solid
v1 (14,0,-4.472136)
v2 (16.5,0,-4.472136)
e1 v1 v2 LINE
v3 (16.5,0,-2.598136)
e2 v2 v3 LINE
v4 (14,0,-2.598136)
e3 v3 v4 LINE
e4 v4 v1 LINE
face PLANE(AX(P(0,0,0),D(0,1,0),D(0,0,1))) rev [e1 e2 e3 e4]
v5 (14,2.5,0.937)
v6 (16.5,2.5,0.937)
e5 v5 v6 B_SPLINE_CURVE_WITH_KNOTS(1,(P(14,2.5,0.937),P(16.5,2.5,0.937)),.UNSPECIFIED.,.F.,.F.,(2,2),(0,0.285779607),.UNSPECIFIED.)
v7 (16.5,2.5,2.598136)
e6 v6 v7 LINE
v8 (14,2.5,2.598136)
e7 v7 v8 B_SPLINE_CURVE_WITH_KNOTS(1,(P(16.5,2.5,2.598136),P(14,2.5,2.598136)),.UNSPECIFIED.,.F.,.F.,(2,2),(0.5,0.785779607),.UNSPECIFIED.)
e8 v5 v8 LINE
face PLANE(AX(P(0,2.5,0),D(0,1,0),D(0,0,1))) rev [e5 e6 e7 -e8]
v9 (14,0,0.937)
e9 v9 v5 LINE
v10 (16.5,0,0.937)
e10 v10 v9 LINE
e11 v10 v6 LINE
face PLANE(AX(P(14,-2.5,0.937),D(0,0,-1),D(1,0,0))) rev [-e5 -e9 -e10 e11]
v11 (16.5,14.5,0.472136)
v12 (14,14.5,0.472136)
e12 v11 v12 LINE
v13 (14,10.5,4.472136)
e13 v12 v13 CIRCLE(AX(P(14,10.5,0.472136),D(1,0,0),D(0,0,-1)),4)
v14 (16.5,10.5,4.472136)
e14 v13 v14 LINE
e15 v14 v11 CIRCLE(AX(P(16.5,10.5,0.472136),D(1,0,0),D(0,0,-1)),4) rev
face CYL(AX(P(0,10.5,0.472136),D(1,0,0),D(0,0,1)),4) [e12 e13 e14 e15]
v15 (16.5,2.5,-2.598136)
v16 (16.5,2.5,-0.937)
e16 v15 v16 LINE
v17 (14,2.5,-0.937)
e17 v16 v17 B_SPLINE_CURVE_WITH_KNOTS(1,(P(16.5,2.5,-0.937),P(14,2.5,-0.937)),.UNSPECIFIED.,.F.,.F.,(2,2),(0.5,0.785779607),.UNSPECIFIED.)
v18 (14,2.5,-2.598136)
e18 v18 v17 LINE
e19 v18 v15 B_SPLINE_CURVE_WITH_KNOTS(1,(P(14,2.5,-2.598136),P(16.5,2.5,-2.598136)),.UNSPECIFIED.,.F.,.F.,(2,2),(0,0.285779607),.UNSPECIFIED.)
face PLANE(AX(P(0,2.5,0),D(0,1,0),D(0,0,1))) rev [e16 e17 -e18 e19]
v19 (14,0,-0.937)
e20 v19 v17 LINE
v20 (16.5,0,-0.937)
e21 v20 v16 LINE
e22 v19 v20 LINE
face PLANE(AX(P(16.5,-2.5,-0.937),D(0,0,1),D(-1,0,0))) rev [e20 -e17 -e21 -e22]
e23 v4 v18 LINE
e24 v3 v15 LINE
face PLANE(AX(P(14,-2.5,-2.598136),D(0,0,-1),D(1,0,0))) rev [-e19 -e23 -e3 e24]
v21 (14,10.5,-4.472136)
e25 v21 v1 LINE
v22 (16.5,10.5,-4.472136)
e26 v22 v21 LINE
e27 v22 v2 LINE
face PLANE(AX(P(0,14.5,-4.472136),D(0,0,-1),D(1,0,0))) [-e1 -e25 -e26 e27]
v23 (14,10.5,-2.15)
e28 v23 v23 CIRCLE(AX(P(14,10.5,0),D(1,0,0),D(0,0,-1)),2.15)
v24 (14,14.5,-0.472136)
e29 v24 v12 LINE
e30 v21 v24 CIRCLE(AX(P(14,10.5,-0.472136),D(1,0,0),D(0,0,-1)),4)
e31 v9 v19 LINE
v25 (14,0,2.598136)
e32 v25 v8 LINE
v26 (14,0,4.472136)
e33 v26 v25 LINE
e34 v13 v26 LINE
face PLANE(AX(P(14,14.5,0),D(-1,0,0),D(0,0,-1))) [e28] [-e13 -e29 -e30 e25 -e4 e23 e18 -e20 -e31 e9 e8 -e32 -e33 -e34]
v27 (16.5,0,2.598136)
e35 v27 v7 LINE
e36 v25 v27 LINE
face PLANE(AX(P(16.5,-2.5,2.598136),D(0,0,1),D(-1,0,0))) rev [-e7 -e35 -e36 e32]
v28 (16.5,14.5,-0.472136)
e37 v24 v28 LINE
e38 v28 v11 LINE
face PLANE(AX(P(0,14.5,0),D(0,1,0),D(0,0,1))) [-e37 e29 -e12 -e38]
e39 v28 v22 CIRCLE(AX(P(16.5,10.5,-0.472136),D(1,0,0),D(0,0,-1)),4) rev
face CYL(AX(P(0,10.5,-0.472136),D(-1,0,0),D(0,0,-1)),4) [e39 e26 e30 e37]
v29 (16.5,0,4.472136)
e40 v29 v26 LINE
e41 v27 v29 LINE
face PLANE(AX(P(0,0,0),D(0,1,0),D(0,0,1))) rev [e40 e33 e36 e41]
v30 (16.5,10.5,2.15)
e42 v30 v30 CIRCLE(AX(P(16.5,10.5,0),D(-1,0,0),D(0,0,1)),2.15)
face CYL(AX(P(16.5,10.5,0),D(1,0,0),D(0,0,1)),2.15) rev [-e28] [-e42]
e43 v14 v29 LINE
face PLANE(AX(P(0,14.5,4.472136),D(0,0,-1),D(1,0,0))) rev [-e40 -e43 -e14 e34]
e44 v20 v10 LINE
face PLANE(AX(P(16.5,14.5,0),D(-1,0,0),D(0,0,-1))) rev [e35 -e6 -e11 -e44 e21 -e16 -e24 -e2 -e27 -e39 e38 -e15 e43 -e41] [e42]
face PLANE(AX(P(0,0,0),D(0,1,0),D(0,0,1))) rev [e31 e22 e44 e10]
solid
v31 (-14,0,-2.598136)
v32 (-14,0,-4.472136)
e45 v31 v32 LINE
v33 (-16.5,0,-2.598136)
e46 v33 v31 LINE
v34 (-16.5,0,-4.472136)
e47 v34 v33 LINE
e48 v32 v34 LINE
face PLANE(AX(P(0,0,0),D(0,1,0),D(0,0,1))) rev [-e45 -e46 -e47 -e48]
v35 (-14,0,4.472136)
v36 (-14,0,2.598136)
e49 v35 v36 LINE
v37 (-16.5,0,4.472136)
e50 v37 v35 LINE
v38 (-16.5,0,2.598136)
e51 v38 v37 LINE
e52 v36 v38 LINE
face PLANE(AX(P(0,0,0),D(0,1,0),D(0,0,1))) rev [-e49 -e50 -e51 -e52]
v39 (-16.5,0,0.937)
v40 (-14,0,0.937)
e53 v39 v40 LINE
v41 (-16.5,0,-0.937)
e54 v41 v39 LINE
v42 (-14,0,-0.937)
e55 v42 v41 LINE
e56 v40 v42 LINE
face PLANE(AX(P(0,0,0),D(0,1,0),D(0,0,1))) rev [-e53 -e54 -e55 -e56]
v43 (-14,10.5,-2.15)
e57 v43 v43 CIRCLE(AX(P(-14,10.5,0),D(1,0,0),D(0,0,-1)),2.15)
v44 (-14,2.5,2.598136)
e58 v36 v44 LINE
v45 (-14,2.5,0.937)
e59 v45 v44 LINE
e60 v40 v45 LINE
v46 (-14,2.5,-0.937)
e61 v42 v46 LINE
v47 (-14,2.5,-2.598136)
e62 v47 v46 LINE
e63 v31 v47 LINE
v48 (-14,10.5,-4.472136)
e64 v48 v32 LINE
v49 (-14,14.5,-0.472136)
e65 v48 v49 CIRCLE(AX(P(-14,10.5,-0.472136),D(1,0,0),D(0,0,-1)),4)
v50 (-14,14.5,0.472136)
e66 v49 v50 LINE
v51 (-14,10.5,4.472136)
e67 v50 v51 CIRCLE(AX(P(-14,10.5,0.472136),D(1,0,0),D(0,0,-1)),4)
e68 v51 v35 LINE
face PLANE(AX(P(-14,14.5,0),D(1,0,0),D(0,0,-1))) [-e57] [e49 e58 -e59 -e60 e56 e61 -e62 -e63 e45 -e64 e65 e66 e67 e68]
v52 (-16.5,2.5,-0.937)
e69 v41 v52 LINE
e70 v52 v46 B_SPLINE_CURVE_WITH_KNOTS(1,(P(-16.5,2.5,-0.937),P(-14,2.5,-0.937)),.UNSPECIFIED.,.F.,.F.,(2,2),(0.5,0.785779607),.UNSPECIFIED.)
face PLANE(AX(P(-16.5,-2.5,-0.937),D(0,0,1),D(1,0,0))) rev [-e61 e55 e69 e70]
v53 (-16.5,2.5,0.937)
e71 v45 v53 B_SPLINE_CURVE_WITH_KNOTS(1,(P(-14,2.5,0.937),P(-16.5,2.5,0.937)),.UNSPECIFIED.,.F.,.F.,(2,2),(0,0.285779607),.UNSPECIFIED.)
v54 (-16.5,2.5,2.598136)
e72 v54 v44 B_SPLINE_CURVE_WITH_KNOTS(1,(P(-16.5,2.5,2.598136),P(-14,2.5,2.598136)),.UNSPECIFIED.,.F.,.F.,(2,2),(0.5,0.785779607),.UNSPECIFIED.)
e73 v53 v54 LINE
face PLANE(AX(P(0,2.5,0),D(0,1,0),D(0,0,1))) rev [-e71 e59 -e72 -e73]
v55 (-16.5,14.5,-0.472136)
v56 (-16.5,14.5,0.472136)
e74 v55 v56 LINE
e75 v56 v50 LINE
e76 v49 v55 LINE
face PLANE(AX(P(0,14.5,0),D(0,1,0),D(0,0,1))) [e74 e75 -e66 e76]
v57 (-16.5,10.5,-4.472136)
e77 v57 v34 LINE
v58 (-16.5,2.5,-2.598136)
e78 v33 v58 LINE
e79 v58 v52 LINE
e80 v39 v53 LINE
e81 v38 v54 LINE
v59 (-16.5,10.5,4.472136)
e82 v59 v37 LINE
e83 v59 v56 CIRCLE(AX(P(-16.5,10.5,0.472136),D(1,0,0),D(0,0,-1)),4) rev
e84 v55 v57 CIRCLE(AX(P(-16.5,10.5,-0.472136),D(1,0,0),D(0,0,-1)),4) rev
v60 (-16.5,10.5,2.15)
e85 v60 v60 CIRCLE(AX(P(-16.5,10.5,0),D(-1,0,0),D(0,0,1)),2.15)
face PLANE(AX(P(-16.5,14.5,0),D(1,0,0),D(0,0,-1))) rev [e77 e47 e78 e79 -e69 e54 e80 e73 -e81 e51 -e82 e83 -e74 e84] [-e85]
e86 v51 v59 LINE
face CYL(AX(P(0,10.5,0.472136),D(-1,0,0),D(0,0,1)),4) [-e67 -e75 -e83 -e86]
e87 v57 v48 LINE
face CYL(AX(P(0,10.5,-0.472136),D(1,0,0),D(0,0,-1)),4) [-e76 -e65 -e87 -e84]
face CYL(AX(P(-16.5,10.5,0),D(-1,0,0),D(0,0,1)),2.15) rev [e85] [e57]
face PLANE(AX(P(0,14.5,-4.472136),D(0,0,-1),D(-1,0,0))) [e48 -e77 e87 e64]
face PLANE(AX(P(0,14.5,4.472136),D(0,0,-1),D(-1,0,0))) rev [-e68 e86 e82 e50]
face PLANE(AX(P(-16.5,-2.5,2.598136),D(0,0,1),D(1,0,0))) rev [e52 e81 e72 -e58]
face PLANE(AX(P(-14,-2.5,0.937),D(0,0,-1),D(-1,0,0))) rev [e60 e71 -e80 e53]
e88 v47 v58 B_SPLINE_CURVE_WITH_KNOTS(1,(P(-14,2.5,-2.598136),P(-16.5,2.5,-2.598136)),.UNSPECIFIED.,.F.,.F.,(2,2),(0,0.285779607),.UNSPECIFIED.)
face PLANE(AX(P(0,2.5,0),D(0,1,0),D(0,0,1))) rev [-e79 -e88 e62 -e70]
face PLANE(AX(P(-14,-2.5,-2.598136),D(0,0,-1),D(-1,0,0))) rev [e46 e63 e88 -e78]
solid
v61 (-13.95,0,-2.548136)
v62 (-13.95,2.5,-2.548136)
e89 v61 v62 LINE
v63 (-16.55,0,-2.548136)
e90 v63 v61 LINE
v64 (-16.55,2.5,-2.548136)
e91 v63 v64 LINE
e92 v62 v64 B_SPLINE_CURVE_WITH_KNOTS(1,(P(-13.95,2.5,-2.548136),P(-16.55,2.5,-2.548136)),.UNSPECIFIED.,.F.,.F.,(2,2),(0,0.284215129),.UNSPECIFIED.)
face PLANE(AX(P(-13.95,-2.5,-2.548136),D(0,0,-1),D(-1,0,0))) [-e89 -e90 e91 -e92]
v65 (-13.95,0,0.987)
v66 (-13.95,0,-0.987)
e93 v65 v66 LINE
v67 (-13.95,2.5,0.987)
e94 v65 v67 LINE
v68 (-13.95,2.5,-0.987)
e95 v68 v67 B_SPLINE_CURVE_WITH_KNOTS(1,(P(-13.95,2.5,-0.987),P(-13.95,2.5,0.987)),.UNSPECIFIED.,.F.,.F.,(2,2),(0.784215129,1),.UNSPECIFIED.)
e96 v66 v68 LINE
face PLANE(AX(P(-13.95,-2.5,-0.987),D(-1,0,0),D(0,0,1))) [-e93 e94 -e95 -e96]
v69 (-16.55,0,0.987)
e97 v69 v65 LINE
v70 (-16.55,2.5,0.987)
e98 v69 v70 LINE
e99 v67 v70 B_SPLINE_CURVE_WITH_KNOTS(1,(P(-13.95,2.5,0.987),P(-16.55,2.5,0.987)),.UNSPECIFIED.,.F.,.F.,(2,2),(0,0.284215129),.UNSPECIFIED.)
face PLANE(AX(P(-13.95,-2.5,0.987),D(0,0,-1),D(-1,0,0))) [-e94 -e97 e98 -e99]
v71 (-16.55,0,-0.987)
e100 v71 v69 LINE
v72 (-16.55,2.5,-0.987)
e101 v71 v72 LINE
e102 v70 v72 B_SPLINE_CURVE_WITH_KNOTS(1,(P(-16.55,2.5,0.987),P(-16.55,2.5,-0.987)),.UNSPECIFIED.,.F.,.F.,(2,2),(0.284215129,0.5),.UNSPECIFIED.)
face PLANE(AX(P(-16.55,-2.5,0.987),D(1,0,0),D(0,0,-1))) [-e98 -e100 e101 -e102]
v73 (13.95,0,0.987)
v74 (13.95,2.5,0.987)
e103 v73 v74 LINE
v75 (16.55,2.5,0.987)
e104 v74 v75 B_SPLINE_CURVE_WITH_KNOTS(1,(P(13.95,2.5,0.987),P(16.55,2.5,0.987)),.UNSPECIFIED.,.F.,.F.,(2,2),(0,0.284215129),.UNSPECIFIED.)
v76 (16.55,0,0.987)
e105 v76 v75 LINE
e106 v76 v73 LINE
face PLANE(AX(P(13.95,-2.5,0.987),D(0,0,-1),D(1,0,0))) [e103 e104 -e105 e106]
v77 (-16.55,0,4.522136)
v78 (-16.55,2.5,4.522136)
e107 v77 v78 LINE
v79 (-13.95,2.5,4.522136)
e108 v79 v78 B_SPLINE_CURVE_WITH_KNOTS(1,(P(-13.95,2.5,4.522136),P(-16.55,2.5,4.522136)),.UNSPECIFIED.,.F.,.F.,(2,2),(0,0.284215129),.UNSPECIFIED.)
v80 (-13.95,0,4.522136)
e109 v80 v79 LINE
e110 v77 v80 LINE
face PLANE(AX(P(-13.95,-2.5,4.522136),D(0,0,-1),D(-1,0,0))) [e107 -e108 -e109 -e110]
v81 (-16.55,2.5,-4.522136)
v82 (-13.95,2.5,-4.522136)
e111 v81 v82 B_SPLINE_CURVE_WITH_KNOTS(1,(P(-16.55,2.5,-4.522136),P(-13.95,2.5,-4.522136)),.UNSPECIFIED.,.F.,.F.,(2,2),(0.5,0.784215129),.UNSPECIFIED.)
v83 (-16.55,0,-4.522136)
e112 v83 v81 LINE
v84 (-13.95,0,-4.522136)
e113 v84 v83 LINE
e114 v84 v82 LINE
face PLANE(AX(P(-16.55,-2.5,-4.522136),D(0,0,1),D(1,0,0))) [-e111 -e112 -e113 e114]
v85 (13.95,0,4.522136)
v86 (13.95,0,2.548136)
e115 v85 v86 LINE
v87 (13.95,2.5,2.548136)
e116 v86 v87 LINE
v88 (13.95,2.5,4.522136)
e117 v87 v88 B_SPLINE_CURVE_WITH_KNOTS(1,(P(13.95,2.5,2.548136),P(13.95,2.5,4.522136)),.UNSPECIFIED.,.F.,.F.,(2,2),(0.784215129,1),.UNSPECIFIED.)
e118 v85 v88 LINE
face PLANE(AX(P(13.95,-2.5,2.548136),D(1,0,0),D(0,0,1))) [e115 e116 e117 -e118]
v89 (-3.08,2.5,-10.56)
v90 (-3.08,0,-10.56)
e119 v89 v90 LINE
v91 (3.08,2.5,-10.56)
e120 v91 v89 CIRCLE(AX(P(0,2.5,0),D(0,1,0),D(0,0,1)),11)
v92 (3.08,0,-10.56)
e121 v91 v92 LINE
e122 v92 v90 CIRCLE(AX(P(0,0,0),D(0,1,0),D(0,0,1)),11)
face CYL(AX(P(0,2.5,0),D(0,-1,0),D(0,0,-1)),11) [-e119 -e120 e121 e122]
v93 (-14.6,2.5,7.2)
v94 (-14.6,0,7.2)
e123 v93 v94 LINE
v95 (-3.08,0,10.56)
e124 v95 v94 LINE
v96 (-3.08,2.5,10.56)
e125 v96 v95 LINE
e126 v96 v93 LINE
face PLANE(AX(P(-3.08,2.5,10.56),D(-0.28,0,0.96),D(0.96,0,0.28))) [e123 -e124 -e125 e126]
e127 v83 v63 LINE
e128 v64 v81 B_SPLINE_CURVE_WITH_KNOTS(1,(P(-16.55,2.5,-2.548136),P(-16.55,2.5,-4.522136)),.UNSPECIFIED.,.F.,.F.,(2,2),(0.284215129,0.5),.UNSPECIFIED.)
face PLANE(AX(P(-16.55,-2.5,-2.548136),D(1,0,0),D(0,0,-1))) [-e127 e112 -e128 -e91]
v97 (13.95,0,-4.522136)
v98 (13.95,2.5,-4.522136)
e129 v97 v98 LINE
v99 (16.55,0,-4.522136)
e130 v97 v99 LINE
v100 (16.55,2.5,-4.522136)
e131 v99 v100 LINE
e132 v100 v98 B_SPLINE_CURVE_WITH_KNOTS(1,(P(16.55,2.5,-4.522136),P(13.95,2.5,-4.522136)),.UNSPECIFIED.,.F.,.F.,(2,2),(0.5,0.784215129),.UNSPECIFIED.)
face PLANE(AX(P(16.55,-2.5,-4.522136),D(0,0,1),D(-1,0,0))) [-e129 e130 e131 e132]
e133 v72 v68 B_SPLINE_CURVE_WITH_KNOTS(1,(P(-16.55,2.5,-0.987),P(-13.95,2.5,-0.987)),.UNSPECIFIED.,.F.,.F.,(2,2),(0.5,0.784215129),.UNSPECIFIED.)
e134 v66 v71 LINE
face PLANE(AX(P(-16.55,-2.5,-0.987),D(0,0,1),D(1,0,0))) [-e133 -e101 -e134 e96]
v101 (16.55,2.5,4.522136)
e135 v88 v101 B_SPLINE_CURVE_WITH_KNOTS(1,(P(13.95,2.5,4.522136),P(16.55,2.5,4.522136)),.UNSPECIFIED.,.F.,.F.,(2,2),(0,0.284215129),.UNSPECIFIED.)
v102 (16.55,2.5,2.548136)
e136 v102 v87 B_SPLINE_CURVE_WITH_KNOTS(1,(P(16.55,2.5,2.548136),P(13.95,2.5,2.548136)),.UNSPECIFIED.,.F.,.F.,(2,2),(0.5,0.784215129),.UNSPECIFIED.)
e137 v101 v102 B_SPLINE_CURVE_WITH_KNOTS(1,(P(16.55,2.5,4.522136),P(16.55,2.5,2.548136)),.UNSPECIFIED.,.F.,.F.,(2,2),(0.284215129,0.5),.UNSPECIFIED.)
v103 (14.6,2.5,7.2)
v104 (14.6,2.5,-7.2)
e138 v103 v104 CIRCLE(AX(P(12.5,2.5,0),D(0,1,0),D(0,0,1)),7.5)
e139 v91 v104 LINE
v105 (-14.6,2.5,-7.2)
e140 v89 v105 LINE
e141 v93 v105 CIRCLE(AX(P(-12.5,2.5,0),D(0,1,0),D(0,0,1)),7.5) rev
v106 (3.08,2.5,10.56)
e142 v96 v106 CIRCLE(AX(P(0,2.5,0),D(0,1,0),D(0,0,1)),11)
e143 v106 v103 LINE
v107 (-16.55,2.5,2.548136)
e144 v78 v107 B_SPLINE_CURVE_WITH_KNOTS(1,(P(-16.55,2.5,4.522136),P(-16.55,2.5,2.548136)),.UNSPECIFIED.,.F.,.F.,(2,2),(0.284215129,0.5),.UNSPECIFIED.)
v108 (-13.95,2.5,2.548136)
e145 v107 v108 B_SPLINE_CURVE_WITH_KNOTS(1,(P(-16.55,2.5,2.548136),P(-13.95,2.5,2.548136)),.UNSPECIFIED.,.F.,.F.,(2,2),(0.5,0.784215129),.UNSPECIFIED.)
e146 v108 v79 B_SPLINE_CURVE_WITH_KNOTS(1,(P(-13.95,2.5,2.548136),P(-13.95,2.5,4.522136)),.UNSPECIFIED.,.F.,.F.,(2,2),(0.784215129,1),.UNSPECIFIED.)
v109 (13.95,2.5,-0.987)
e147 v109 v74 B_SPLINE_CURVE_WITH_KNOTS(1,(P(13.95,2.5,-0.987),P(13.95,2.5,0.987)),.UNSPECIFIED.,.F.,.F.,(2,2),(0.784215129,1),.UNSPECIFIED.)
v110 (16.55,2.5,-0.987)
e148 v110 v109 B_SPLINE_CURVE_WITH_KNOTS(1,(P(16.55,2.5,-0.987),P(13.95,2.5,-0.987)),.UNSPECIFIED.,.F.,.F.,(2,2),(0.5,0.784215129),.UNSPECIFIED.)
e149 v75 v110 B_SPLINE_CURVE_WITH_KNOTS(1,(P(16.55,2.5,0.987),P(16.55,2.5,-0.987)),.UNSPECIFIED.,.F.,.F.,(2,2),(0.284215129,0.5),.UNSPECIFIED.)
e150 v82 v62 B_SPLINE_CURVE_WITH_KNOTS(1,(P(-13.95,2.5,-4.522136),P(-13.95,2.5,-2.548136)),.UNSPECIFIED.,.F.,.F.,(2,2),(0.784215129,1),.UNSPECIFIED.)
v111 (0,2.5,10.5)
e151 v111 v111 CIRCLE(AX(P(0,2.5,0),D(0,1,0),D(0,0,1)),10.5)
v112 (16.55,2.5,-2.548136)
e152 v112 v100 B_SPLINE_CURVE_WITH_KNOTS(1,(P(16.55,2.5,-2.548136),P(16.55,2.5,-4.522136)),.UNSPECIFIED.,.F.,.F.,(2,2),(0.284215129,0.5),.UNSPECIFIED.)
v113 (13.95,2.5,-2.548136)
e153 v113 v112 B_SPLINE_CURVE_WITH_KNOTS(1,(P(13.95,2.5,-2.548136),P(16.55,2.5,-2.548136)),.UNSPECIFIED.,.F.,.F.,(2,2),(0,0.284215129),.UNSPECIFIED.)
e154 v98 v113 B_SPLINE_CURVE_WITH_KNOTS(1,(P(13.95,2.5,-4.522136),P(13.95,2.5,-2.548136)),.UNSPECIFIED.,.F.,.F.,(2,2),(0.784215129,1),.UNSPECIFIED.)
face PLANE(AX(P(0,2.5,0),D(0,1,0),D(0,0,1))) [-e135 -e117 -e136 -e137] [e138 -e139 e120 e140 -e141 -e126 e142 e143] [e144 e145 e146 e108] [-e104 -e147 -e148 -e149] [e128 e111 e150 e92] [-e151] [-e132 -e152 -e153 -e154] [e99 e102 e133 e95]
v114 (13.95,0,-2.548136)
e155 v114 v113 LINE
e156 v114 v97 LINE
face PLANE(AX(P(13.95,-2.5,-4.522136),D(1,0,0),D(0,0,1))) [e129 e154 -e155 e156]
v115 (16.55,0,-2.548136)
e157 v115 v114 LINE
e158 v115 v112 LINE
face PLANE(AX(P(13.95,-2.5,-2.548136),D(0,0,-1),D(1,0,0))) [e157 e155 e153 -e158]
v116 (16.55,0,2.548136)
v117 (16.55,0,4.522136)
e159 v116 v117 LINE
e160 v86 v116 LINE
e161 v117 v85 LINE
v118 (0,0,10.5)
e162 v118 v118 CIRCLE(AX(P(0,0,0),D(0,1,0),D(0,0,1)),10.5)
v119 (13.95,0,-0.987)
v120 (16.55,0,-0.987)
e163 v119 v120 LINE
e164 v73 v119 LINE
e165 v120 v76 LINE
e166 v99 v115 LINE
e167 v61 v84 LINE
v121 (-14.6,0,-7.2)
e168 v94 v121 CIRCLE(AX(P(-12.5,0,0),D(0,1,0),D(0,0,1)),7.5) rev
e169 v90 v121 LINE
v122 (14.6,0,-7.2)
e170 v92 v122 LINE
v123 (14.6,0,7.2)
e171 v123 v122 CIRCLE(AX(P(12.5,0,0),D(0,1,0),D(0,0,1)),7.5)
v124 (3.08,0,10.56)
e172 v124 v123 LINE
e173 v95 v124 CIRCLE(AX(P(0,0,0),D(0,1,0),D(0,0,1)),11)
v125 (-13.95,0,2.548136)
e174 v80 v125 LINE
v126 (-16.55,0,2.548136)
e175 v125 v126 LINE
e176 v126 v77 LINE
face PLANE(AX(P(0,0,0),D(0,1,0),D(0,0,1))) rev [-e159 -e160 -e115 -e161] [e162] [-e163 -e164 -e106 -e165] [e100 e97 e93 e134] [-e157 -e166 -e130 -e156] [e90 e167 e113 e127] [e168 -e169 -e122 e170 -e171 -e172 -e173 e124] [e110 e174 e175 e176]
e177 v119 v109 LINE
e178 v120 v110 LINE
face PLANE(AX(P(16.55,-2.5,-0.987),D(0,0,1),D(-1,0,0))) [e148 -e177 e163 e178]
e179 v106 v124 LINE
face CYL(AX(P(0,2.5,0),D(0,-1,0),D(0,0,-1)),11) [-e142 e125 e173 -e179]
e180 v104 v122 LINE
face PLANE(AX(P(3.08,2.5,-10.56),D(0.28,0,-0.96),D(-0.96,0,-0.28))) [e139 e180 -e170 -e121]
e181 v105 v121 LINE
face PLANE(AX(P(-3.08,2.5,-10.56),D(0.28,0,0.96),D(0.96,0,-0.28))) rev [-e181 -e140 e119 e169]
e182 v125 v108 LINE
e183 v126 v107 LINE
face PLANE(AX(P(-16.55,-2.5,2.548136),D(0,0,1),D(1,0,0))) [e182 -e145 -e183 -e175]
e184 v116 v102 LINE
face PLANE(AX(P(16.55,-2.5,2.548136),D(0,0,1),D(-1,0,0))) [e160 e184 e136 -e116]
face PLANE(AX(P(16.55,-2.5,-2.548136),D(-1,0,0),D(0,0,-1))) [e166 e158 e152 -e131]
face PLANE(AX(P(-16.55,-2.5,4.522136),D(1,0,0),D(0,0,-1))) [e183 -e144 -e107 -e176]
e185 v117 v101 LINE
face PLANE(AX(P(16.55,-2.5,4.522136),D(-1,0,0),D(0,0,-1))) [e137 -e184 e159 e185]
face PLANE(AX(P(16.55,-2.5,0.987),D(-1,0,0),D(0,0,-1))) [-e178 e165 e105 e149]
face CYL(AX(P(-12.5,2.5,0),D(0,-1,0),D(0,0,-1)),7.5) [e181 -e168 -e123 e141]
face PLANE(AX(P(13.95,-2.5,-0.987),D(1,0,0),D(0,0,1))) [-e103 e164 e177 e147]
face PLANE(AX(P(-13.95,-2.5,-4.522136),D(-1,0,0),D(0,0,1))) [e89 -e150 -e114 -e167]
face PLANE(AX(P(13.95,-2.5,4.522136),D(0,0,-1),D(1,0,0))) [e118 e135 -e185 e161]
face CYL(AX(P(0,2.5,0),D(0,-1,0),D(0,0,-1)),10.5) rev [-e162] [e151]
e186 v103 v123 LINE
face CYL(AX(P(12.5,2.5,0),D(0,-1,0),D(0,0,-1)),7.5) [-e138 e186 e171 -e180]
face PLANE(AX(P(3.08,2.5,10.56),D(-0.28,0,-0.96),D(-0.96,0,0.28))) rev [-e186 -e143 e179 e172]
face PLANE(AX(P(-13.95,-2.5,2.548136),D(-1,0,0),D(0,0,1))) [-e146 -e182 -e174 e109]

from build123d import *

# Parameters (mm, degrees)
SKETCH1_R                    = 10.5
BOSS_EXTRUDE1_DEPTH          = 2.5
SKETCH2_W                    = 2.5
SKETCH2_H                    = 8.94427191
BOSS_EXTRUDE2_DEPTH          = 12
SKETCH5_W                    = 2.15
SKETCH5_H                    = 36.5
FILLET1_R                    = 4
TAB_START                    = -16.5
TAB_AND_SLOT_TAB1_OUTLINE_W  = 2.5
TAB_AND_SLOT_TAB1_OUTLINE_H  = 1.874
TAB_AND_SLOT_TAB1_DEPTH      = 2.5
TAB_START_2                  = -16.55
TAB_AND_SLOT_SLOT1_OUTLINE_W = 2.5
TAB_AND_SLOT_SLOT1_OUTLINE_H = 1.974
TAB_AND_SLOT_SLOT1_DEPTH     = 2.6


# Read off the part's stored shape, not the designer's step: Tab and Slot-Tab1, Tab and Slot-Slot1
with BuildPart() as part:
    # Sketch1 → Boss-Extrude1 (new body)
    with BuildSketch(Plane(origin=(0, 0, 0), x_dir=(1, 0, 0), z_dir=(0, 1, 0))):
        with BuildLine():
            Line((14.6, 7.2), (3.08, 10.56))
            ThreePointArc((3.08, 10.56), (0, 11), (-3.08, 10.56))
            Line((-3.08, 10.56), (-14.6, 7.2))
            ThreePointArc((-14.6, 7.2), (-20, 0), (-14.6, -7.2))
            Line((-14.6, -7.2), (-3.08, -10.56))
            ThreePointArc((-3.08, -10.56), (0, -11), (3.08, -10.56))
            Line((3.08, -10.56), (14.6, -7.2))
            ThreePointArc((14.6, -7.2), (20, 0), (14.6, 7.2))
        make_face()
        with Locations(Location((0, 0, 0), (0, 0, 270))):
            Circle(SKETCH1_R, mode=Mode.SUBTRACT)
    extrude(amount=BOSS_EXTRUDE1_DEPTH)

    # Tab and Slot-Slot1 outline → Tab and Slot-Slot1 (cut)
    with BuildSketch(Plane.YZ.offset(TAB_START_2)):
        with Locations((1.25, 3.535135955)):
            Rectangle(TAB_AND_SLOT_SLOT1_OUTLINE_W, TAB_AND_SLOT_SLOT1_OUTLINE_H)
        with Locations((1.25, 0)):
            Rectangle(TAB_AND_SLOT_SLOT1_OUTLINE_W, TAB_AND_SLOT_SLOT1_OUTLINE_H)
        with Locations((1.25, -3.535135955)):
            Rectangle(TAB_AND_SLOT_SLOT1_OUTLINE_W, TAB_AND_SLOT_SLOT1_OUTLINE_H)
    tab_and_slot_slot1 = extrude(amount=TAB_AND_SLOT_SLOT1_DEPTH, mode=Mode.SUBTRACT)

    # Mirror1: Tab and Slot-Slot1 across plane
    add(tab_and_slot_slot1.mirror(Plane(origin=(0, 0, 0), x_dir=(0, 0, 1), z_dir=(1, 0, 0))), mode=Mode.SUBTRACT)


with BuildPart() as body_2:
    # Sketch2 → Boss-Extrude2 (new body)
    with BuildSketch(Plane(origin=(0, 2.5, 0), x_dir=(1, 0, 0), z_dir=(0, 1, 0))):
        with Locations((-15.25, 0)):
            Rectangle(SKETCH2_W, SKETCH2_H)
    extrude(amount=BOSS_EXTRUDE2_DEPTH)

    # Sketch5 → M4 Clearance Hole1 (revolve, cut)
    with BuildSketch(Plane(origin=(-16.5, 10.5, 0), x_dir=(0, 0, 1), z_dir=(0, 1, 0))):
        with Locations((1.075, 18.25)):
            Rectangle(SKETCH5_W, SKETCH5_H)
    revolve(axis=Axis((-22.85, 10.5, 0), (1, 0, 0)), mode=Mode.SUBTRACT)

    # Fillet1
    fillet1_edges = [body_2.edges().sort_by_distance(p)[0] for p in [
        (-15.25, 14.5, -4.472135955),
        (-15.25, 14.5, 4.472135955),
    ]]
    fillet(fillet1_edges, radius=FILLET1_R)

    # Tab and Slot-Tab1 outline → Tab and Slot-Tab1 (add)
    with BuildSketch(Plane.YZ.offset(TAB_START)):
        with Locations((1.25, -3.535135955)):
            Rectangle(TAB_AND_SLOT_TAB1_OUTLINE_W, TAB_AND_SLOT_TAB1_OUTLINE_H)
        with Locations((1.25, 3.535135955)):
            Rectangle(TAB_AND_SLOT_TAB1_OUTLINE_W, TAB_AND_SLOT_TAB1_OUTLINE_H)
        with Locations((1.25, 0)):
            Rectangle(TAB_AND_SLOT_TAB1_OUTLINE_W, TAB_AND_SLOT_TAB1_OUTLINE_H)
    extrude(amount=TAB_AND_SLOT_TAB1_DEPTH)


with BuildPart() as body_3:
    # Mirror2: mirrored copy
    add(body_2.part.mirror(Plane(origin=(0, 0, 0), x_dir=(0, 0, 1), z_dir=(1, 0, 0))))


solid = Compound([part.part, body_2.part, body_3.part])
